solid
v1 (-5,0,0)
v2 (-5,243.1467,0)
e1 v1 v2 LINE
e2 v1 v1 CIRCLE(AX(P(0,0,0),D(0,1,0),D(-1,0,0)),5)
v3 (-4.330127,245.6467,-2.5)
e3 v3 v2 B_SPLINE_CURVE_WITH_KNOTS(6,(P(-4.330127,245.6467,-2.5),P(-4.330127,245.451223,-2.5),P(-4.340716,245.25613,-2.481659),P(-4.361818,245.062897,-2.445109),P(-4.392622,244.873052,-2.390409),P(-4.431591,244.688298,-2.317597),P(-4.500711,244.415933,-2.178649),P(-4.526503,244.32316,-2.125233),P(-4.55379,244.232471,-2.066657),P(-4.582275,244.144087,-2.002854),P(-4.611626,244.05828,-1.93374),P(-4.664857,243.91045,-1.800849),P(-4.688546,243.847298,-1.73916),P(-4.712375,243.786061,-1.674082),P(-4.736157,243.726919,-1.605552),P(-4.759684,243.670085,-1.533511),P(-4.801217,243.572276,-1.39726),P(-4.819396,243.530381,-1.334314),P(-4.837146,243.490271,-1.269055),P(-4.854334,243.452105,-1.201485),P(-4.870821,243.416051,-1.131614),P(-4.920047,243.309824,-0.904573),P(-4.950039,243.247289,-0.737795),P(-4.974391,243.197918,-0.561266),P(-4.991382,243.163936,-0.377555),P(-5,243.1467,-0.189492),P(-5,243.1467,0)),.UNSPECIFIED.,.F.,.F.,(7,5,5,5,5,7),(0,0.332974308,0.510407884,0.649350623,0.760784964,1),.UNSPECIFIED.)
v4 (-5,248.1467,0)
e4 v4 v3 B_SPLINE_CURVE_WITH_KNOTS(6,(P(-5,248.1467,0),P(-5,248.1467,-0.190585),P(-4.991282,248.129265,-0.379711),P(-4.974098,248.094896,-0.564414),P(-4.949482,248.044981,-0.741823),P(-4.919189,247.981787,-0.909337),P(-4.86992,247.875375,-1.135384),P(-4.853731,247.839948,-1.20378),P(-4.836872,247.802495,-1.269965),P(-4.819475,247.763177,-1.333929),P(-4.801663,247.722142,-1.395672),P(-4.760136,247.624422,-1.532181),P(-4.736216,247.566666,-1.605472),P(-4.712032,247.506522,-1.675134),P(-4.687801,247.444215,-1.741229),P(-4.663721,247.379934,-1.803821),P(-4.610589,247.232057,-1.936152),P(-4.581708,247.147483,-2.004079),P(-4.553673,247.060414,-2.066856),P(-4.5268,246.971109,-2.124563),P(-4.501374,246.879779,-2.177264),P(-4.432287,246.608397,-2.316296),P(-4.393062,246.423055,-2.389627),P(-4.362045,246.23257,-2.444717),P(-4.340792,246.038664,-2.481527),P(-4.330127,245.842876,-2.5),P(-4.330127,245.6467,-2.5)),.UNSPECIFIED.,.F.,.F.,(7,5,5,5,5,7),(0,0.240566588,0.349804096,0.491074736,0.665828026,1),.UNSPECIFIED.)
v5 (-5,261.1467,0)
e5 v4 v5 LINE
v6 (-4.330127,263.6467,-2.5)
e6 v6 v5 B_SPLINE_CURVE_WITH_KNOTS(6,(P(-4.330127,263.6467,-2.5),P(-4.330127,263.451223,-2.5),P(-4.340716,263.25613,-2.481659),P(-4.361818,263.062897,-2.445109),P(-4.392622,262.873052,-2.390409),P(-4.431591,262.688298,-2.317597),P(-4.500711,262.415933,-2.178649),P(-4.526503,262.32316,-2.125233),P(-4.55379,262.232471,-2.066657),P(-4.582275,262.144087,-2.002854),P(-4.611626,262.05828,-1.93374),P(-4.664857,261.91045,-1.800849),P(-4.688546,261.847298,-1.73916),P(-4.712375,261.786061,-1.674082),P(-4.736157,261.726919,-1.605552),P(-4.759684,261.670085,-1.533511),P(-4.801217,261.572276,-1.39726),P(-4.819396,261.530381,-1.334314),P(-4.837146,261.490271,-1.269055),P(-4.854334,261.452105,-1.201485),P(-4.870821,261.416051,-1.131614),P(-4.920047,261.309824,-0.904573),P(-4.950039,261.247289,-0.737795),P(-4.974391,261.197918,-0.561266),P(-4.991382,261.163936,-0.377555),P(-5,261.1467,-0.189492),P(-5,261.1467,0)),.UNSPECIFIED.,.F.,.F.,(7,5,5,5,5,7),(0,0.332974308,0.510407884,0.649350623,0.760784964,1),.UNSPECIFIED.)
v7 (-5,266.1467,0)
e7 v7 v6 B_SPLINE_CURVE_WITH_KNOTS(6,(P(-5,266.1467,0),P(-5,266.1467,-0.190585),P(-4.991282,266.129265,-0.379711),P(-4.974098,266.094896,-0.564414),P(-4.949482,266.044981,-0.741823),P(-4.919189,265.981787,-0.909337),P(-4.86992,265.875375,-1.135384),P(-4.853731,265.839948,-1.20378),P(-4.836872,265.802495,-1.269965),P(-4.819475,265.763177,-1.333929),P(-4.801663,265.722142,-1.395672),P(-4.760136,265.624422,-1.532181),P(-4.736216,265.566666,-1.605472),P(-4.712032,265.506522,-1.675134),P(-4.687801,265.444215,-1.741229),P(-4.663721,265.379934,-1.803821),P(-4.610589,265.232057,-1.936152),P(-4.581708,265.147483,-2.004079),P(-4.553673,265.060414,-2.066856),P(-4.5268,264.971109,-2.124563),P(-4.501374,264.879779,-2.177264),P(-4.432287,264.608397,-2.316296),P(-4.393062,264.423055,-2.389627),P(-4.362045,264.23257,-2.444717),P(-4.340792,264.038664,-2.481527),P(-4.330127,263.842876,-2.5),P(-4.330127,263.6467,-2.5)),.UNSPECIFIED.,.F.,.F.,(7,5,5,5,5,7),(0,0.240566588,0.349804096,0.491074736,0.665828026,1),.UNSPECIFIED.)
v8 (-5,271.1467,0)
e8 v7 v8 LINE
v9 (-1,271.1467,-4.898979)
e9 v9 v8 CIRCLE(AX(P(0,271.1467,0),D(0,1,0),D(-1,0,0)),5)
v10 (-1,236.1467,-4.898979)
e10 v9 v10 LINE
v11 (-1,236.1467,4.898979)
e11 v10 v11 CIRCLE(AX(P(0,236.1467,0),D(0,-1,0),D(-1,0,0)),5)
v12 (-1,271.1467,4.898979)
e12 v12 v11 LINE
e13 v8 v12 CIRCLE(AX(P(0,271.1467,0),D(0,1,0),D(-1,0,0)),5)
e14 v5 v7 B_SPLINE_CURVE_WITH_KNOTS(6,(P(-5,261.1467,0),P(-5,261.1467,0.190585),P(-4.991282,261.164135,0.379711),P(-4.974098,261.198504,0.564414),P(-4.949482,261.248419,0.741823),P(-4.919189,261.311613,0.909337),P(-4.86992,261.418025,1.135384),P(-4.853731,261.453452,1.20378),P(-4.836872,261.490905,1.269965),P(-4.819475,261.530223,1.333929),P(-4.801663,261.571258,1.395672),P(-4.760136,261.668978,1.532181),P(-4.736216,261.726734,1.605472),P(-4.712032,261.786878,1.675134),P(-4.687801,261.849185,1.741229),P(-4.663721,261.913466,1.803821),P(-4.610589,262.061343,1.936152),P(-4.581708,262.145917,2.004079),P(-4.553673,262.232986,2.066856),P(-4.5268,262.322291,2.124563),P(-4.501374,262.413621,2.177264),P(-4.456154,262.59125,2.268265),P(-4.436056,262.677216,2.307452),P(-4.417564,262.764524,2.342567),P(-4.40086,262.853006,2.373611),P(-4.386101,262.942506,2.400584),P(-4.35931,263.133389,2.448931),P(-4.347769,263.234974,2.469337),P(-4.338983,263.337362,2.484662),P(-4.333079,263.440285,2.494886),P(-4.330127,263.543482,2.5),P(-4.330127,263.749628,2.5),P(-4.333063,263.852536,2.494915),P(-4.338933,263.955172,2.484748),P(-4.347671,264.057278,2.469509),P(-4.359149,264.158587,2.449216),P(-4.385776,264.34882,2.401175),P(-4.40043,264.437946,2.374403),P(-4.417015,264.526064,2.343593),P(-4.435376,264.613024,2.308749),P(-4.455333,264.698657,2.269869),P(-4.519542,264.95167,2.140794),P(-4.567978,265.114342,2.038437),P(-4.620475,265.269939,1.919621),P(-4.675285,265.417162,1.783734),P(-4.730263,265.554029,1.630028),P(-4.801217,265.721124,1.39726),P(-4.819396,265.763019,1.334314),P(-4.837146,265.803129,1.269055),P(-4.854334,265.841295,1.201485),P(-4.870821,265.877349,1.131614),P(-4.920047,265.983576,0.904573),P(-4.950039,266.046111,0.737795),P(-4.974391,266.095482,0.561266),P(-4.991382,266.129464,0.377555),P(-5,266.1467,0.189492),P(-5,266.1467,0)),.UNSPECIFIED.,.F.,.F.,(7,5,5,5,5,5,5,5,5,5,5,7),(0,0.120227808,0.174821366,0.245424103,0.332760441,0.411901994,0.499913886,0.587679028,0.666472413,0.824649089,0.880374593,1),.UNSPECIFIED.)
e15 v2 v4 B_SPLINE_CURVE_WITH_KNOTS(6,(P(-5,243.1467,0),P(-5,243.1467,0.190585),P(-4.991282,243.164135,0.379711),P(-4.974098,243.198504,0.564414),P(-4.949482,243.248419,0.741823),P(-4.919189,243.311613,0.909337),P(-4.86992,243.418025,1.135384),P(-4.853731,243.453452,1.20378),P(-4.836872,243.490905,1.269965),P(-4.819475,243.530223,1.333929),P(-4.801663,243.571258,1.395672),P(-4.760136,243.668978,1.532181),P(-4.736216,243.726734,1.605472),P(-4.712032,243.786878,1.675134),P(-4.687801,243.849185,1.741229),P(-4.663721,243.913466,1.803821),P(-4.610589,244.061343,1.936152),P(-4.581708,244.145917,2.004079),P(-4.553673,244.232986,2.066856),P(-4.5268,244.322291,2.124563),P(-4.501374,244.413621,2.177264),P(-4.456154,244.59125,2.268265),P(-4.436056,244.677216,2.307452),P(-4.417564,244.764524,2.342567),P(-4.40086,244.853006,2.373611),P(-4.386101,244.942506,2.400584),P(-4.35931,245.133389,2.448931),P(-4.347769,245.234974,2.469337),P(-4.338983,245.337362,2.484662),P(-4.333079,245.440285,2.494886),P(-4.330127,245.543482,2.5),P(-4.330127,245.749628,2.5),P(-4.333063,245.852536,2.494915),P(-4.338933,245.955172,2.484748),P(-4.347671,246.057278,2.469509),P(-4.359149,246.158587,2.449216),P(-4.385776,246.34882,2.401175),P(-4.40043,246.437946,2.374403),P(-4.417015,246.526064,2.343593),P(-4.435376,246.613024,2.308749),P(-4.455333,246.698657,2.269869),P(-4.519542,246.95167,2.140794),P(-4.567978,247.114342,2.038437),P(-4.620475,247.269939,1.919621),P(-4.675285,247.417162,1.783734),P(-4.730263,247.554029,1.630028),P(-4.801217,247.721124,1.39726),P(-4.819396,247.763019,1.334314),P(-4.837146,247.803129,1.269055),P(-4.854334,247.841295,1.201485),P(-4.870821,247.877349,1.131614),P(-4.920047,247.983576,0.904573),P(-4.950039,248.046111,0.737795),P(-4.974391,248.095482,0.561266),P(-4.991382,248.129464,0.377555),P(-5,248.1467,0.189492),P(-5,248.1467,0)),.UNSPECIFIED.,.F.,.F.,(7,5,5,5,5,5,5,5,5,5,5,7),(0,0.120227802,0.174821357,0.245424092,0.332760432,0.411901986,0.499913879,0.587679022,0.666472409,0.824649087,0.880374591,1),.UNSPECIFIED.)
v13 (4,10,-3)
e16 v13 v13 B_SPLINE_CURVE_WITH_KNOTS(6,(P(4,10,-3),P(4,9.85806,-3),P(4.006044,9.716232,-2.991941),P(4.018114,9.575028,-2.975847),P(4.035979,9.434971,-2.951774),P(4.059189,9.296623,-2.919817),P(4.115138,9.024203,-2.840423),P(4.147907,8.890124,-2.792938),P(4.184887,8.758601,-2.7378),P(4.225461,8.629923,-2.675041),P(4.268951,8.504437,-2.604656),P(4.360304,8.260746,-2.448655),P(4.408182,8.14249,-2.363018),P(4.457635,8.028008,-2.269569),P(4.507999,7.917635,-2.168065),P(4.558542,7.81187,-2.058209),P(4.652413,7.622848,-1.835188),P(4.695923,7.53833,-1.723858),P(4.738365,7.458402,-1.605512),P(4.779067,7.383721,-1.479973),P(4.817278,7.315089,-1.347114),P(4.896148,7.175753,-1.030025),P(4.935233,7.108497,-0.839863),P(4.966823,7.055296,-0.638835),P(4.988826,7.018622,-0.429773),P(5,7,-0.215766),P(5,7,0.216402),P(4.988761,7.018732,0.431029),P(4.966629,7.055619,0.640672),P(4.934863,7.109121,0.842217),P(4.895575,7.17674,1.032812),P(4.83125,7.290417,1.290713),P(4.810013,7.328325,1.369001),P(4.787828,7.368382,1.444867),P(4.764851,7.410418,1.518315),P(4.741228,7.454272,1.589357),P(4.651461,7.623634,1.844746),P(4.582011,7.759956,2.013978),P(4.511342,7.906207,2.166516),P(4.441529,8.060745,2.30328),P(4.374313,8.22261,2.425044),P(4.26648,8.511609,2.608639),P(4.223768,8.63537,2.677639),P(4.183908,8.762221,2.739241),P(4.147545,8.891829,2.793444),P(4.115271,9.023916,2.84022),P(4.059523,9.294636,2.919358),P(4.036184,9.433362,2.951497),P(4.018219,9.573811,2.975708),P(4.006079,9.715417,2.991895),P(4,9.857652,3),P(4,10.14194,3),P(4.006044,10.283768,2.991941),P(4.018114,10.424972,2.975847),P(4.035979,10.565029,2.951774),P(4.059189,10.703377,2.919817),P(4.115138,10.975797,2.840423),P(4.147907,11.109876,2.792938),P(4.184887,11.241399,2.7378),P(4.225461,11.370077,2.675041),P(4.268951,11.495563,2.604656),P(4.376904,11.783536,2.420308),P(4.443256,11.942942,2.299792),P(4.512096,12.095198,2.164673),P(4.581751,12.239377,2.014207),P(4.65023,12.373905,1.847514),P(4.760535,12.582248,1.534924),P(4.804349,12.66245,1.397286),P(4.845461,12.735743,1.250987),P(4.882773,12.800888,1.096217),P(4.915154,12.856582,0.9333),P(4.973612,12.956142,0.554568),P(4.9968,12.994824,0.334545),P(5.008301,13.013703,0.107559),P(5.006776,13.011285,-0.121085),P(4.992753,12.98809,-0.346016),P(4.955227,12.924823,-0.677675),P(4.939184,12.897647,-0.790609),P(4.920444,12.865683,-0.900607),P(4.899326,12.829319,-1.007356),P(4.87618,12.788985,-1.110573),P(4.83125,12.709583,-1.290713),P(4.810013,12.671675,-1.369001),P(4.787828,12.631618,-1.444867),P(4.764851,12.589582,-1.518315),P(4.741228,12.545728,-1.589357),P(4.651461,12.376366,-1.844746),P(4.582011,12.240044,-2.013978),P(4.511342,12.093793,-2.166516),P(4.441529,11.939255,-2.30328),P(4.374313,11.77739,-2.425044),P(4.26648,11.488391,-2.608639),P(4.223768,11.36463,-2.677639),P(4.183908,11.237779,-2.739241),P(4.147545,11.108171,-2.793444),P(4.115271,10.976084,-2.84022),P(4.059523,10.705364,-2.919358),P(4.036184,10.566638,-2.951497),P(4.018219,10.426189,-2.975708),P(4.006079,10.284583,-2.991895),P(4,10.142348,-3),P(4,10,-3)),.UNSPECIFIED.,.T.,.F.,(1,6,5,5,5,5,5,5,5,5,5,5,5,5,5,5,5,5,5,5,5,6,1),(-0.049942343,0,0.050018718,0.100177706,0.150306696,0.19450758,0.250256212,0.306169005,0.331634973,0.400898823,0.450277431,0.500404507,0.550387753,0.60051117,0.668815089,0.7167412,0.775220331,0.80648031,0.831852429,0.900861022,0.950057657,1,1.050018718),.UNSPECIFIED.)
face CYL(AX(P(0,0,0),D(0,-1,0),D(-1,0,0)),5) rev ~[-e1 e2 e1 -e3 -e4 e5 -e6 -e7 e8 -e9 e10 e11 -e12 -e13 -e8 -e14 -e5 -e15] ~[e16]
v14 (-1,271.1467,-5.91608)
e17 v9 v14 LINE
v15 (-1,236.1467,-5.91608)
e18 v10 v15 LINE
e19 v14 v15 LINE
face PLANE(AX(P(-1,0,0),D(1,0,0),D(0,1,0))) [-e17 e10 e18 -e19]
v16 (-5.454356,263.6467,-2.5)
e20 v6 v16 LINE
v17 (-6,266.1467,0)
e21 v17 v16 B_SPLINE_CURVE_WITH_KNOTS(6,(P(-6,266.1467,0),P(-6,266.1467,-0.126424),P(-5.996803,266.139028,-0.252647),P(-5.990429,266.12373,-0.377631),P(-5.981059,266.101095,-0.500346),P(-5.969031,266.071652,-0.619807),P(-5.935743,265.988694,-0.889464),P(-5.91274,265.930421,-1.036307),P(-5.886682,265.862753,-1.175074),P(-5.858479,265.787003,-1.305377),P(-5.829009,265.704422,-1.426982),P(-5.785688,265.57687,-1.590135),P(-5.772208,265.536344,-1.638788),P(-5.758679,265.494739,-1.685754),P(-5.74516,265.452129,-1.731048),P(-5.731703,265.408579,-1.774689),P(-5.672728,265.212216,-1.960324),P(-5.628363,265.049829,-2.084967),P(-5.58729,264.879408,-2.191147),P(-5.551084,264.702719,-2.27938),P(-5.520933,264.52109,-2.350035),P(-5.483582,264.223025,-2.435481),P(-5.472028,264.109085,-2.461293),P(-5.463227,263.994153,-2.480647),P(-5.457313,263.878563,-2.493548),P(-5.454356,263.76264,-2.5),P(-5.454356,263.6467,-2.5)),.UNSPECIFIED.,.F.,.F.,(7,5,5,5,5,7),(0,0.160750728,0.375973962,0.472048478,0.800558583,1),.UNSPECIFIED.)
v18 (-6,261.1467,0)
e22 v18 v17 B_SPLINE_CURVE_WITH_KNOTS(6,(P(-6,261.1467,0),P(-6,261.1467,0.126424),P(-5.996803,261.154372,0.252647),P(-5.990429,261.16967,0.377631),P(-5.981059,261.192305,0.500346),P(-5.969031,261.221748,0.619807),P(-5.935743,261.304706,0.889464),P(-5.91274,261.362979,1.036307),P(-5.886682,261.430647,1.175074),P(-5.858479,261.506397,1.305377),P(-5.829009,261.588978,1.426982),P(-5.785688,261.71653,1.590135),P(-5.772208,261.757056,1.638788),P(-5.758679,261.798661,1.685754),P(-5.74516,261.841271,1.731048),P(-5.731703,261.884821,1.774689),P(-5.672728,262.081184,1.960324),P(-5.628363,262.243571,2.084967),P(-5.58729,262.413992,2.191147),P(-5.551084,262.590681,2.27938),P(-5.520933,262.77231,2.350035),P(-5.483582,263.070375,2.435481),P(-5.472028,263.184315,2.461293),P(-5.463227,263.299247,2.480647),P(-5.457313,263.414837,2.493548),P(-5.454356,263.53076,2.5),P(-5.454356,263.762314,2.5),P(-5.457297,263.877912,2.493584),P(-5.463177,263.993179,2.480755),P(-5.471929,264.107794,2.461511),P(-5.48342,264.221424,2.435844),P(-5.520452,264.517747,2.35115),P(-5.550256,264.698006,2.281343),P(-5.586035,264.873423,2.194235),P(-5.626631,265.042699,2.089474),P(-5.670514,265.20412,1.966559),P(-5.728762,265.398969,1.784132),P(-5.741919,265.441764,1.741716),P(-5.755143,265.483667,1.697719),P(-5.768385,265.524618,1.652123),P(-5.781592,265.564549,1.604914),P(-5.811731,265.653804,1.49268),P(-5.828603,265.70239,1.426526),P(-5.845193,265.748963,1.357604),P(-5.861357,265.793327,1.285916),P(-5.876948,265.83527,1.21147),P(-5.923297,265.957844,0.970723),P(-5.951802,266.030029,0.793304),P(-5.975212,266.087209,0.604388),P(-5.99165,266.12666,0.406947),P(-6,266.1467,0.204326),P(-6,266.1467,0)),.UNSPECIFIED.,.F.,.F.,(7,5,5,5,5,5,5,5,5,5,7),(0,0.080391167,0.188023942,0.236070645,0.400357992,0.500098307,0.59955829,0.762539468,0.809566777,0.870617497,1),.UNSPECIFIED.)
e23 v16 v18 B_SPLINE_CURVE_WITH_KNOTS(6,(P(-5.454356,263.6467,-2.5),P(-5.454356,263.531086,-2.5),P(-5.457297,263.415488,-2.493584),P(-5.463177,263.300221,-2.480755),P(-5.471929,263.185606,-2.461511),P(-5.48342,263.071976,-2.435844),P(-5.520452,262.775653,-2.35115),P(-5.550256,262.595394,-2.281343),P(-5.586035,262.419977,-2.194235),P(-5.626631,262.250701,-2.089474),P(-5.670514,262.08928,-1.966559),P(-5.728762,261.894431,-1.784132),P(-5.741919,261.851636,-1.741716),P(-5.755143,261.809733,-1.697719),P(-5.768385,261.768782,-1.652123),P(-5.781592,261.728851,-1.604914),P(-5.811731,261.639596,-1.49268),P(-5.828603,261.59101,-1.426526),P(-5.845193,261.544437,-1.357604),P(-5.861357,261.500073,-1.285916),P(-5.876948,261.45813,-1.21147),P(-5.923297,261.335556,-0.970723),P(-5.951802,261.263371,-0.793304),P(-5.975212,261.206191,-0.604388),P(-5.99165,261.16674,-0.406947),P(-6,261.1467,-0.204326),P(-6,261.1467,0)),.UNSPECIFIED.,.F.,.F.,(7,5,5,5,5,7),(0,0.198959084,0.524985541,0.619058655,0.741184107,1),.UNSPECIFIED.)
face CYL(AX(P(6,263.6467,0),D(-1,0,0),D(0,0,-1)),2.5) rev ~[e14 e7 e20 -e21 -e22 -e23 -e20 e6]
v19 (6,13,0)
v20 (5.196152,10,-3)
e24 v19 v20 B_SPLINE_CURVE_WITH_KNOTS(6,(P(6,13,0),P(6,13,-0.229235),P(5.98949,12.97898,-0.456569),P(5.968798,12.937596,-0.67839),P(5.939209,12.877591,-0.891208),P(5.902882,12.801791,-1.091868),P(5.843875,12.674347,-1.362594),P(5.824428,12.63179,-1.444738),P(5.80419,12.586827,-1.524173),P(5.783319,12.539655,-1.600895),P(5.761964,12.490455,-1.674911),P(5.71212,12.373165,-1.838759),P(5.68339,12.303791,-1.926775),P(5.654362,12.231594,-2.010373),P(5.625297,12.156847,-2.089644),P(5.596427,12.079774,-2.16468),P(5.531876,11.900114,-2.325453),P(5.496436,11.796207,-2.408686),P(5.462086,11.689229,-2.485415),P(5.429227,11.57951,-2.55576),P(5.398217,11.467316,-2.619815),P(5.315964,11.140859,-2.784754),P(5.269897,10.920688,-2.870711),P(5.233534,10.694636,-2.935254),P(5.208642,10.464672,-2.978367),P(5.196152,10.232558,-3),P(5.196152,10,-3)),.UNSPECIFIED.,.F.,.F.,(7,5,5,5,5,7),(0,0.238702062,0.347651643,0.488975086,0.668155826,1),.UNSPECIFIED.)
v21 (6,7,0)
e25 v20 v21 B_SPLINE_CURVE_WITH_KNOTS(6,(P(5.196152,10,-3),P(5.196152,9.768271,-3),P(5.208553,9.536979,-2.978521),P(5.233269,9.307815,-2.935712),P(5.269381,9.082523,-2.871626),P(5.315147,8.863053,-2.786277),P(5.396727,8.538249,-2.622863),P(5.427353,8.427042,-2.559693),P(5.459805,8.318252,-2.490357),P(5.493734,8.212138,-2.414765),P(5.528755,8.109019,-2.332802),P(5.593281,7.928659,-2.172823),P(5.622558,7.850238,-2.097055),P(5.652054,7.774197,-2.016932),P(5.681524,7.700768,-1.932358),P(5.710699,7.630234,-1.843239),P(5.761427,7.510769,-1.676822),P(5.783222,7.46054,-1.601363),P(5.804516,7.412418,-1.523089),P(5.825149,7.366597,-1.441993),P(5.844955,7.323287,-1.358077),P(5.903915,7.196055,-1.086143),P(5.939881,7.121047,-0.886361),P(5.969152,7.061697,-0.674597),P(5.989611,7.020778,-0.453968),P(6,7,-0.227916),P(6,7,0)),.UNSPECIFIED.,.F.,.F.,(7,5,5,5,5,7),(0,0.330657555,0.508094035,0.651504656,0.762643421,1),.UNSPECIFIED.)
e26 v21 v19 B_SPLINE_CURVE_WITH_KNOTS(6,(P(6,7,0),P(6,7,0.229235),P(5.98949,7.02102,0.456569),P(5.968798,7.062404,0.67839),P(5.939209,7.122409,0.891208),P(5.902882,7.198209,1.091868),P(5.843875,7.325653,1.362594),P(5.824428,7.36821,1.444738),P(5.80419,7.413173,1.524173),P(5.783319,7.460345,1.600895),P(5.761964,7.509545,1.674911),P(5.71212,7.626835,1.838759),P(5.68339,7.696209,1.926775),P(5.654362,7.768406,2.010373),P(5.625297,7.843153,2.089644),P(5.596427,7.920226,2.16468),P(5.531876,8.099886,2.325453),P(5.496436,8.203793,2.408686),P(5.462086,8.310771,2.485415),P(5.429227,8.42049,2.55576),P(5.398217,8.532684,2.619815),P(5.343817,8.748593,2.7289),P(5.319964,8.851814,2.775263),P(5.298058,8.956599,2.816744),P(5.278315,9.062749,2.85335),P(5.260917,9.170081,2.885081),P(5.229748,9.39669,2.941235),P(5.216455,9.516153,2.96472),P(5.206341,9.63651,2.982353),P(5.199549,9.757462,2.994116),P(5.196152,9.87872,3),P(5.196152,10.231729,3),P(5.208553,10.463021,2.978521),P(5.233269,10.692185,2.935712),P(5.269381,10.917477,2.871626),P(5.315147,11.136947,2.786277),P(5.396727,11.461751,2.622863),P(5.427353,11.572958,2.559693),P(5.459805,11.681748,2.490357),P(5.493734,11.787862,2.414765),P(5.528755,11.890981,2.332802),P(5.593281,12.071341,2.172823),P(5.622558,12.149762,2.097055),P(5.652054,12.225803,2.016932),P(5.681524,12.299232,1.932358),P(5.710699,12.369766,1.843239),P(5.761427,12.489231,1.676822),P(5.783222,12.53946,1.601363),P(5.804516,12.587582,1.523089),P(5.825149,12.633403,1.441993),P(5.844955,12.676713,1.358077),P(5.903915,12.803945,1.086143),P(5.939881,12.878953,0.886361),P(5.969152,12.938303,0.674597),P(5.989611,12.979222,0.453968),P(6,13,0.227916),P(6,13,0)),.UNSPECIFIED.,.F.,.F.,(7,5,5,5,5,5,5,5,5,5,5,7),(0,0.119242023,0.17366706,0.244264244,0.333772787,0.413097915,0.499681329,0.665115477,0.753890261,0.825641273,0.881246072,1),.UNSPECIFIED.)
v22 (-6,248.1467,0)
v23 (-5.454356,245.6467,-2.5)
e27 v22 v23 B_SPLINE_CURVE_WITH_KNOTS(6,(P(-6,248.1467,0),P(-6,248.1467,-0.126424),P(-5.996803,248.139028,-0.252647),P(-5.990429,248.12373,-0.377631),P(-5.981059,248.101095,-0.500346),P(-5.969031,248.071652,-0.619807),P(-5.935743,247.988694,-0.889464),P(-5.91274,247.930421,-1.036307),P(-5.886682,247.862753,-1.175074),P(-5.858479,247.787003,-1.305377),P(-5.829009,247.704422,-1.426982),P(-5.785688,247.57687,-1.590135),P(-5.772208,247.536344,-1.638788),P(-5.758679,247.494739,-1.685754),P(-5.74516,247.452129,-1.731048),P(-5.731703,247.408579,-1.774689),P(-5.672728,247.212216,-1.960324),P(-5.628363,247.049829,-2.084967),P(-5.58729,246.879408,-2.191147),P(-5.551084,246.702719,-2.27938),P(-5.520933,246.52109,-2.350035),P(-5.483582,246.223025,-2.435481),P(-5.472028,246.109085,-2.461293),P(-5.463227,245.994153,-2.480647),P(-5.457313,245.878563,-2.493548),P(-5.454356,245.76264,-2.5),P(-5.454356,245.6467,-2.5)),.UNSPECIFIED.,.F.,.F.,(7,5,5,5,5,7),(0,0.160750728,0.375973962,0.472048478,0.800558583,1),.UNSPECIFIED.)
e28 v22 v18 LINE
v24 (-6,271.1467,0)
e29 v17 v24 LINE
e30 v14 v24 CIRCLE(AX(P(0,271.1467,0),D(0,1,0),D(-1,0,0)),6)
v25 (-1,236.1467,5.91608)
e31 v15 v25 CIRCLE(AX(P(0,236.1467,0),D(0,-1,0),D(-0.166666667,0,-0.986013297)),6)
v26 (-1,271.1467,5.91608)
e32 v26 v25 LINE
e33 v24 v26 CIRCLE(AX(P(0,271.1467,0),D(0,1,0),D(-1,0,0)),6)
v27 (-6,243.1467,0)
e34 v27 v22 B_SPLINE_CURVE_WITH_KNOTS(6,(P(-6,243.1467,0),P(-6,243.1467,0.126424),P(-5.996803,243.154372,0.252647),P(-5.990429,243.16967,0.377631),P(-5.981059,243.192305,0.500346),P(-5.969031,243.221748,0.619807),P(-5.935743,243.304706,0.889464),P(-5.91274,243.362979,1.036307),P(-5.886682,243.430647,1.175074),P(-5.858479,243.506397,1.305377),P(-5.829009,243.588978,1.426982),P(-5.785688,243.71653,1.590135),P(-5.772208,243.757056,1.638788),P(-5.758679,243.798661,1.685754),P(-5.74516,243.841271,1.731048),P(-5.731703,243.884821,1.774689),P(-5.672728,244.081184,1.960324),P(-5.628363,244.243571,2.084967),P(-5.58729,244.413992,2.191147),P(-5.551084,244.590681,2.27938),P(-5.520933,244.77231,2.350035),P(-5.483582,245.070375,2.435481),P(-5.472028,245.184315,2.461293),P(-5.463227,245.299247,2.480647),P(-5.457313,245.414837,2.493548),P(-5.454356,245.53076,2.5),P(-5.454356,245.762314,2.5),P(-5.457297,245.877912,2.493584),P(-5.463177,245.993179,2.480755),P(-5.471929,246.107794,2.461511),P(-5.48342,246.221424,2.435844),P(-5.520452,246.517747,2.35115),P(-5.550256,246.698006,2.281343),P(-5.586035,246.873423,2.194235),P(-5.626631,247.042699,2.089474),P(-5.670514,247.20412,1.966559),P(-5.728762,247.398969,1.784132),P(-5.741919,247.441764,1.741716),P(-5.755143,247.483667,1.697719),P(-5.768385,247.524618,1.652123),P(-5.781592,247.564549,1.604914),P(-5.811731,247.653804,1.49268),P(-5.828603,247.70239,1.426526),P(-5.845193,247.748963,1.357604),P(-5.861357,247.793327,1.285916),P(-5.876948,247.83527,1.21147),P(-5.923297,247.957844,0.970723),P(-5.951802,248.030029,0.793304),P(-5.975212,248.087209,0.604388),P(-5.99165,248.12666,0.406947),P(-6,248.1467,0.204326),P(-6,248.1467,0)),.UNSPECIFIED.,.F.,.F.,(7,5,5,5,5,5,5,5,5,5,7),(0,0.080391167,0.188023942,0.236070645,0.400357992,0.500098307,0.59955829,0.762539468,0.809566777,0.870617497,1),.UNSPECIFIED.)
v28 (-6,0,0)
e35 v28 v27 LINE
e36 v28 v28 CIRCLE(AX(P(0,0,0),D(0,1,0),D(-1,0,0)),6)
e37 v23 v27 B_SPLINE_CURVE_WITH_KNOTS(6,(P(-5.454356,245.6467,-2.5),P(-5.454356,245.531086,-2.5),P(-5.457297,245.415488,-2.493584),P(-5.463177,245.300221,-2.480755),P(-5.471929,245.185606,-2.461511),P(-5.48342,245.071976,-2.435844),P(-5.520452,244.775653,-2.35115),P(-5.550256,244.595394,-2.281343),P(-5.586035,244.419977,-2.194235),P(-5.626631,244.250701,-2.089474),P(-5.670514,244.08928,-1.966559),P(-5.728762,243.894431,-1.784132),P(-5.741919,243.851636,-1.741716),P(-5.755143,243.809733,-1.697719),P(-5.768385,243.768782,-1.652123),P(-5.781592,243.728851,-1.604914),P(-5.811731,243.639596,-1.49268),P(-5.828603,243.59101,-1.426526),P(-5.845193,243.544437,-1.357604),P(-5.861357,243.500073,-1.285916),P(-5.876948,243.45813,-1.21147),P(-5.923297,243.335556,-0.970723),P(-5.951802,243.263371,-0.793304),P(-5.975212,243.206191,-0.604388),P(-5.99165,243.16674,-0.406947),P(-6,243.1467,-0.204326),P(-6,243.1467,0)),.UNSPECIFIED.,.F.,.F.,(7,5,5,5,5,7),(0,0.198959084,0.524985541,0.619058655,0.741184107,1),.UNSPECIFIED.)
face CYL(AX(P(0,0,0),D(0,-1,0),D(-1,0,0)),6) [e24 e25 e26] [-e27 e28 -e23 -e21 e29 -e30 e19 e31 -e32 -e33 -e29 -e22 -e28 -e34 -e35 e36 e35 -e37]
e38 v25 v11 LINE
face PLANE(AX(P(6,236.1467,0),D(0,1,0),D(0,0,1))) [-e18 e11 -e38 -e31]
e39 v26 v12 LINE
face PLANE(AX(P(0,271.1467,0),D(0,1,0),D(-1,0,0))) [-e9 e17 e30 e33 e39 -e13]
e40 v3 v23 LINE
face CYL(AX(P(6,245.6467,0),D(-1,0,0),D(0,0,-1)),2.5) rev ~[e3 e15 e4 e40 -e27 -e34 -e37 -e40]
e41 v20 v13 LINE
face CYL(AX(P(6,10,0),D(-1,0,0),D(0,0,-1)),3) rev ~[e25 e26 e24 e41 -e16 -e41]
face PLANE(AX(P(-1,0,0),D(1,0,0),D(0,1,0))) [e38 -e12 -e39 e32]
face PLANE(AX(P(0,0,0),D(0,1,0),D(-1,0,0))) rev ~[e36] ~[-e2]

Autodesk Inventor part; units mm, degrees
ref_plane "XZ Plane" through (0, 0, 0) normal (0, 1, 0) x (-1, 0, 0)
ref_plane "XY Plane" through (0, 0, 0) normal (0, 0, 1) x (1, 0, 0)
sketch "Sketch1" plane through (0, 0, 0) normal (0, 1, 0) x (-1, 0, 0)
  circle A0 centre (0, 0) radius 5
  circle A1 centre (0, 0) radius 6
  dimension "d1" = 1
  dimension "d34" = 10
extrude "Extrusion1" add sketch "Sketch1" along normal blind 271.1467
ref_plane "Work Plane3" through (6, 0, 0) normal (1, 0, 0) x (0, 1, 0)
sketch "Sketch2" plane through (6, 0, 0) normal (1, 0, 0) x (0, 1, 0)
  line L0 (0, -6) -> (271.1467, -6) projected
  line L1 (0, 6) -> (271.1467, 6) projected
  line L2 (271.1467, -6) -> (271.1467, 6) projected
  line L3 (-54.2293, 0) -> (325.3761, 0) projected
  point P0 (0, 0)
  point P1 (10, 0)
  point P2 (271.1467, 0)
  dimension "d20" = 10
hole "Hole1" at (6, 10, 0) direction (-1, 0, 0) diameter 6 end up to surface
sketch "Sketch3" plane through (6, 0, 0) normal (1, 0, 0) x (0, 1, 0)
  line L0 (-54.2293, 0) -> (325.3761, 0) projected
  line L1 (271.1467, -6) -> (271.1467, 6) projected
  line L2 (236.1467, 6) -> (271.1467, 6)
  line L3 (271.1467, 6) -> (271.1467, -6)
  line L4 (271.1467, -6) -> (236.1467, -6)
  line L5 (236.1467, -6) -> (236.1467, 6)
  point P0 (0, 0)
  point P1 (245.6467, 0)
  point P2 (263.6467, 0)
  dimension "d22" = 7.5
  dimension "d23" = 18
  dimension "d24" = 35
extrude "Extrusion2" cut sketch "Sketch3" against normal blind 7
hole "Hole3" at (6, 263.6467, 0) at (6, 245.6467, 0) direction (-1, 0, 0) diameter 5 end through all
equation "\"d1\" = pipe_thickness"
equation "\"d34\" = pipe_inner_diameter"
equation "\"d2\" = pipe_length"
equation "\"d24\" = bar_connection"
equation "\"d25\" = pipe_cutout"
equation "\"pipe_length\" = connector_min_length - bar_connection"
equation "\"alfa\" = 45deg"
equation "\"bar_connection\" = 35"
equation "\"pipe_cutout\" = 7"
equation "\"pipe_inner_diameter\" = 10"
equation "\"pipe_thickness\" = 1"
equation "\"pipe_outer_diameter\" = pipe_inner_diameter + 2 * pipe_thickness"
equation "\"connector_min_length\" = 306.146746"
properties part number "pipe" material "Aluminum 6061"
